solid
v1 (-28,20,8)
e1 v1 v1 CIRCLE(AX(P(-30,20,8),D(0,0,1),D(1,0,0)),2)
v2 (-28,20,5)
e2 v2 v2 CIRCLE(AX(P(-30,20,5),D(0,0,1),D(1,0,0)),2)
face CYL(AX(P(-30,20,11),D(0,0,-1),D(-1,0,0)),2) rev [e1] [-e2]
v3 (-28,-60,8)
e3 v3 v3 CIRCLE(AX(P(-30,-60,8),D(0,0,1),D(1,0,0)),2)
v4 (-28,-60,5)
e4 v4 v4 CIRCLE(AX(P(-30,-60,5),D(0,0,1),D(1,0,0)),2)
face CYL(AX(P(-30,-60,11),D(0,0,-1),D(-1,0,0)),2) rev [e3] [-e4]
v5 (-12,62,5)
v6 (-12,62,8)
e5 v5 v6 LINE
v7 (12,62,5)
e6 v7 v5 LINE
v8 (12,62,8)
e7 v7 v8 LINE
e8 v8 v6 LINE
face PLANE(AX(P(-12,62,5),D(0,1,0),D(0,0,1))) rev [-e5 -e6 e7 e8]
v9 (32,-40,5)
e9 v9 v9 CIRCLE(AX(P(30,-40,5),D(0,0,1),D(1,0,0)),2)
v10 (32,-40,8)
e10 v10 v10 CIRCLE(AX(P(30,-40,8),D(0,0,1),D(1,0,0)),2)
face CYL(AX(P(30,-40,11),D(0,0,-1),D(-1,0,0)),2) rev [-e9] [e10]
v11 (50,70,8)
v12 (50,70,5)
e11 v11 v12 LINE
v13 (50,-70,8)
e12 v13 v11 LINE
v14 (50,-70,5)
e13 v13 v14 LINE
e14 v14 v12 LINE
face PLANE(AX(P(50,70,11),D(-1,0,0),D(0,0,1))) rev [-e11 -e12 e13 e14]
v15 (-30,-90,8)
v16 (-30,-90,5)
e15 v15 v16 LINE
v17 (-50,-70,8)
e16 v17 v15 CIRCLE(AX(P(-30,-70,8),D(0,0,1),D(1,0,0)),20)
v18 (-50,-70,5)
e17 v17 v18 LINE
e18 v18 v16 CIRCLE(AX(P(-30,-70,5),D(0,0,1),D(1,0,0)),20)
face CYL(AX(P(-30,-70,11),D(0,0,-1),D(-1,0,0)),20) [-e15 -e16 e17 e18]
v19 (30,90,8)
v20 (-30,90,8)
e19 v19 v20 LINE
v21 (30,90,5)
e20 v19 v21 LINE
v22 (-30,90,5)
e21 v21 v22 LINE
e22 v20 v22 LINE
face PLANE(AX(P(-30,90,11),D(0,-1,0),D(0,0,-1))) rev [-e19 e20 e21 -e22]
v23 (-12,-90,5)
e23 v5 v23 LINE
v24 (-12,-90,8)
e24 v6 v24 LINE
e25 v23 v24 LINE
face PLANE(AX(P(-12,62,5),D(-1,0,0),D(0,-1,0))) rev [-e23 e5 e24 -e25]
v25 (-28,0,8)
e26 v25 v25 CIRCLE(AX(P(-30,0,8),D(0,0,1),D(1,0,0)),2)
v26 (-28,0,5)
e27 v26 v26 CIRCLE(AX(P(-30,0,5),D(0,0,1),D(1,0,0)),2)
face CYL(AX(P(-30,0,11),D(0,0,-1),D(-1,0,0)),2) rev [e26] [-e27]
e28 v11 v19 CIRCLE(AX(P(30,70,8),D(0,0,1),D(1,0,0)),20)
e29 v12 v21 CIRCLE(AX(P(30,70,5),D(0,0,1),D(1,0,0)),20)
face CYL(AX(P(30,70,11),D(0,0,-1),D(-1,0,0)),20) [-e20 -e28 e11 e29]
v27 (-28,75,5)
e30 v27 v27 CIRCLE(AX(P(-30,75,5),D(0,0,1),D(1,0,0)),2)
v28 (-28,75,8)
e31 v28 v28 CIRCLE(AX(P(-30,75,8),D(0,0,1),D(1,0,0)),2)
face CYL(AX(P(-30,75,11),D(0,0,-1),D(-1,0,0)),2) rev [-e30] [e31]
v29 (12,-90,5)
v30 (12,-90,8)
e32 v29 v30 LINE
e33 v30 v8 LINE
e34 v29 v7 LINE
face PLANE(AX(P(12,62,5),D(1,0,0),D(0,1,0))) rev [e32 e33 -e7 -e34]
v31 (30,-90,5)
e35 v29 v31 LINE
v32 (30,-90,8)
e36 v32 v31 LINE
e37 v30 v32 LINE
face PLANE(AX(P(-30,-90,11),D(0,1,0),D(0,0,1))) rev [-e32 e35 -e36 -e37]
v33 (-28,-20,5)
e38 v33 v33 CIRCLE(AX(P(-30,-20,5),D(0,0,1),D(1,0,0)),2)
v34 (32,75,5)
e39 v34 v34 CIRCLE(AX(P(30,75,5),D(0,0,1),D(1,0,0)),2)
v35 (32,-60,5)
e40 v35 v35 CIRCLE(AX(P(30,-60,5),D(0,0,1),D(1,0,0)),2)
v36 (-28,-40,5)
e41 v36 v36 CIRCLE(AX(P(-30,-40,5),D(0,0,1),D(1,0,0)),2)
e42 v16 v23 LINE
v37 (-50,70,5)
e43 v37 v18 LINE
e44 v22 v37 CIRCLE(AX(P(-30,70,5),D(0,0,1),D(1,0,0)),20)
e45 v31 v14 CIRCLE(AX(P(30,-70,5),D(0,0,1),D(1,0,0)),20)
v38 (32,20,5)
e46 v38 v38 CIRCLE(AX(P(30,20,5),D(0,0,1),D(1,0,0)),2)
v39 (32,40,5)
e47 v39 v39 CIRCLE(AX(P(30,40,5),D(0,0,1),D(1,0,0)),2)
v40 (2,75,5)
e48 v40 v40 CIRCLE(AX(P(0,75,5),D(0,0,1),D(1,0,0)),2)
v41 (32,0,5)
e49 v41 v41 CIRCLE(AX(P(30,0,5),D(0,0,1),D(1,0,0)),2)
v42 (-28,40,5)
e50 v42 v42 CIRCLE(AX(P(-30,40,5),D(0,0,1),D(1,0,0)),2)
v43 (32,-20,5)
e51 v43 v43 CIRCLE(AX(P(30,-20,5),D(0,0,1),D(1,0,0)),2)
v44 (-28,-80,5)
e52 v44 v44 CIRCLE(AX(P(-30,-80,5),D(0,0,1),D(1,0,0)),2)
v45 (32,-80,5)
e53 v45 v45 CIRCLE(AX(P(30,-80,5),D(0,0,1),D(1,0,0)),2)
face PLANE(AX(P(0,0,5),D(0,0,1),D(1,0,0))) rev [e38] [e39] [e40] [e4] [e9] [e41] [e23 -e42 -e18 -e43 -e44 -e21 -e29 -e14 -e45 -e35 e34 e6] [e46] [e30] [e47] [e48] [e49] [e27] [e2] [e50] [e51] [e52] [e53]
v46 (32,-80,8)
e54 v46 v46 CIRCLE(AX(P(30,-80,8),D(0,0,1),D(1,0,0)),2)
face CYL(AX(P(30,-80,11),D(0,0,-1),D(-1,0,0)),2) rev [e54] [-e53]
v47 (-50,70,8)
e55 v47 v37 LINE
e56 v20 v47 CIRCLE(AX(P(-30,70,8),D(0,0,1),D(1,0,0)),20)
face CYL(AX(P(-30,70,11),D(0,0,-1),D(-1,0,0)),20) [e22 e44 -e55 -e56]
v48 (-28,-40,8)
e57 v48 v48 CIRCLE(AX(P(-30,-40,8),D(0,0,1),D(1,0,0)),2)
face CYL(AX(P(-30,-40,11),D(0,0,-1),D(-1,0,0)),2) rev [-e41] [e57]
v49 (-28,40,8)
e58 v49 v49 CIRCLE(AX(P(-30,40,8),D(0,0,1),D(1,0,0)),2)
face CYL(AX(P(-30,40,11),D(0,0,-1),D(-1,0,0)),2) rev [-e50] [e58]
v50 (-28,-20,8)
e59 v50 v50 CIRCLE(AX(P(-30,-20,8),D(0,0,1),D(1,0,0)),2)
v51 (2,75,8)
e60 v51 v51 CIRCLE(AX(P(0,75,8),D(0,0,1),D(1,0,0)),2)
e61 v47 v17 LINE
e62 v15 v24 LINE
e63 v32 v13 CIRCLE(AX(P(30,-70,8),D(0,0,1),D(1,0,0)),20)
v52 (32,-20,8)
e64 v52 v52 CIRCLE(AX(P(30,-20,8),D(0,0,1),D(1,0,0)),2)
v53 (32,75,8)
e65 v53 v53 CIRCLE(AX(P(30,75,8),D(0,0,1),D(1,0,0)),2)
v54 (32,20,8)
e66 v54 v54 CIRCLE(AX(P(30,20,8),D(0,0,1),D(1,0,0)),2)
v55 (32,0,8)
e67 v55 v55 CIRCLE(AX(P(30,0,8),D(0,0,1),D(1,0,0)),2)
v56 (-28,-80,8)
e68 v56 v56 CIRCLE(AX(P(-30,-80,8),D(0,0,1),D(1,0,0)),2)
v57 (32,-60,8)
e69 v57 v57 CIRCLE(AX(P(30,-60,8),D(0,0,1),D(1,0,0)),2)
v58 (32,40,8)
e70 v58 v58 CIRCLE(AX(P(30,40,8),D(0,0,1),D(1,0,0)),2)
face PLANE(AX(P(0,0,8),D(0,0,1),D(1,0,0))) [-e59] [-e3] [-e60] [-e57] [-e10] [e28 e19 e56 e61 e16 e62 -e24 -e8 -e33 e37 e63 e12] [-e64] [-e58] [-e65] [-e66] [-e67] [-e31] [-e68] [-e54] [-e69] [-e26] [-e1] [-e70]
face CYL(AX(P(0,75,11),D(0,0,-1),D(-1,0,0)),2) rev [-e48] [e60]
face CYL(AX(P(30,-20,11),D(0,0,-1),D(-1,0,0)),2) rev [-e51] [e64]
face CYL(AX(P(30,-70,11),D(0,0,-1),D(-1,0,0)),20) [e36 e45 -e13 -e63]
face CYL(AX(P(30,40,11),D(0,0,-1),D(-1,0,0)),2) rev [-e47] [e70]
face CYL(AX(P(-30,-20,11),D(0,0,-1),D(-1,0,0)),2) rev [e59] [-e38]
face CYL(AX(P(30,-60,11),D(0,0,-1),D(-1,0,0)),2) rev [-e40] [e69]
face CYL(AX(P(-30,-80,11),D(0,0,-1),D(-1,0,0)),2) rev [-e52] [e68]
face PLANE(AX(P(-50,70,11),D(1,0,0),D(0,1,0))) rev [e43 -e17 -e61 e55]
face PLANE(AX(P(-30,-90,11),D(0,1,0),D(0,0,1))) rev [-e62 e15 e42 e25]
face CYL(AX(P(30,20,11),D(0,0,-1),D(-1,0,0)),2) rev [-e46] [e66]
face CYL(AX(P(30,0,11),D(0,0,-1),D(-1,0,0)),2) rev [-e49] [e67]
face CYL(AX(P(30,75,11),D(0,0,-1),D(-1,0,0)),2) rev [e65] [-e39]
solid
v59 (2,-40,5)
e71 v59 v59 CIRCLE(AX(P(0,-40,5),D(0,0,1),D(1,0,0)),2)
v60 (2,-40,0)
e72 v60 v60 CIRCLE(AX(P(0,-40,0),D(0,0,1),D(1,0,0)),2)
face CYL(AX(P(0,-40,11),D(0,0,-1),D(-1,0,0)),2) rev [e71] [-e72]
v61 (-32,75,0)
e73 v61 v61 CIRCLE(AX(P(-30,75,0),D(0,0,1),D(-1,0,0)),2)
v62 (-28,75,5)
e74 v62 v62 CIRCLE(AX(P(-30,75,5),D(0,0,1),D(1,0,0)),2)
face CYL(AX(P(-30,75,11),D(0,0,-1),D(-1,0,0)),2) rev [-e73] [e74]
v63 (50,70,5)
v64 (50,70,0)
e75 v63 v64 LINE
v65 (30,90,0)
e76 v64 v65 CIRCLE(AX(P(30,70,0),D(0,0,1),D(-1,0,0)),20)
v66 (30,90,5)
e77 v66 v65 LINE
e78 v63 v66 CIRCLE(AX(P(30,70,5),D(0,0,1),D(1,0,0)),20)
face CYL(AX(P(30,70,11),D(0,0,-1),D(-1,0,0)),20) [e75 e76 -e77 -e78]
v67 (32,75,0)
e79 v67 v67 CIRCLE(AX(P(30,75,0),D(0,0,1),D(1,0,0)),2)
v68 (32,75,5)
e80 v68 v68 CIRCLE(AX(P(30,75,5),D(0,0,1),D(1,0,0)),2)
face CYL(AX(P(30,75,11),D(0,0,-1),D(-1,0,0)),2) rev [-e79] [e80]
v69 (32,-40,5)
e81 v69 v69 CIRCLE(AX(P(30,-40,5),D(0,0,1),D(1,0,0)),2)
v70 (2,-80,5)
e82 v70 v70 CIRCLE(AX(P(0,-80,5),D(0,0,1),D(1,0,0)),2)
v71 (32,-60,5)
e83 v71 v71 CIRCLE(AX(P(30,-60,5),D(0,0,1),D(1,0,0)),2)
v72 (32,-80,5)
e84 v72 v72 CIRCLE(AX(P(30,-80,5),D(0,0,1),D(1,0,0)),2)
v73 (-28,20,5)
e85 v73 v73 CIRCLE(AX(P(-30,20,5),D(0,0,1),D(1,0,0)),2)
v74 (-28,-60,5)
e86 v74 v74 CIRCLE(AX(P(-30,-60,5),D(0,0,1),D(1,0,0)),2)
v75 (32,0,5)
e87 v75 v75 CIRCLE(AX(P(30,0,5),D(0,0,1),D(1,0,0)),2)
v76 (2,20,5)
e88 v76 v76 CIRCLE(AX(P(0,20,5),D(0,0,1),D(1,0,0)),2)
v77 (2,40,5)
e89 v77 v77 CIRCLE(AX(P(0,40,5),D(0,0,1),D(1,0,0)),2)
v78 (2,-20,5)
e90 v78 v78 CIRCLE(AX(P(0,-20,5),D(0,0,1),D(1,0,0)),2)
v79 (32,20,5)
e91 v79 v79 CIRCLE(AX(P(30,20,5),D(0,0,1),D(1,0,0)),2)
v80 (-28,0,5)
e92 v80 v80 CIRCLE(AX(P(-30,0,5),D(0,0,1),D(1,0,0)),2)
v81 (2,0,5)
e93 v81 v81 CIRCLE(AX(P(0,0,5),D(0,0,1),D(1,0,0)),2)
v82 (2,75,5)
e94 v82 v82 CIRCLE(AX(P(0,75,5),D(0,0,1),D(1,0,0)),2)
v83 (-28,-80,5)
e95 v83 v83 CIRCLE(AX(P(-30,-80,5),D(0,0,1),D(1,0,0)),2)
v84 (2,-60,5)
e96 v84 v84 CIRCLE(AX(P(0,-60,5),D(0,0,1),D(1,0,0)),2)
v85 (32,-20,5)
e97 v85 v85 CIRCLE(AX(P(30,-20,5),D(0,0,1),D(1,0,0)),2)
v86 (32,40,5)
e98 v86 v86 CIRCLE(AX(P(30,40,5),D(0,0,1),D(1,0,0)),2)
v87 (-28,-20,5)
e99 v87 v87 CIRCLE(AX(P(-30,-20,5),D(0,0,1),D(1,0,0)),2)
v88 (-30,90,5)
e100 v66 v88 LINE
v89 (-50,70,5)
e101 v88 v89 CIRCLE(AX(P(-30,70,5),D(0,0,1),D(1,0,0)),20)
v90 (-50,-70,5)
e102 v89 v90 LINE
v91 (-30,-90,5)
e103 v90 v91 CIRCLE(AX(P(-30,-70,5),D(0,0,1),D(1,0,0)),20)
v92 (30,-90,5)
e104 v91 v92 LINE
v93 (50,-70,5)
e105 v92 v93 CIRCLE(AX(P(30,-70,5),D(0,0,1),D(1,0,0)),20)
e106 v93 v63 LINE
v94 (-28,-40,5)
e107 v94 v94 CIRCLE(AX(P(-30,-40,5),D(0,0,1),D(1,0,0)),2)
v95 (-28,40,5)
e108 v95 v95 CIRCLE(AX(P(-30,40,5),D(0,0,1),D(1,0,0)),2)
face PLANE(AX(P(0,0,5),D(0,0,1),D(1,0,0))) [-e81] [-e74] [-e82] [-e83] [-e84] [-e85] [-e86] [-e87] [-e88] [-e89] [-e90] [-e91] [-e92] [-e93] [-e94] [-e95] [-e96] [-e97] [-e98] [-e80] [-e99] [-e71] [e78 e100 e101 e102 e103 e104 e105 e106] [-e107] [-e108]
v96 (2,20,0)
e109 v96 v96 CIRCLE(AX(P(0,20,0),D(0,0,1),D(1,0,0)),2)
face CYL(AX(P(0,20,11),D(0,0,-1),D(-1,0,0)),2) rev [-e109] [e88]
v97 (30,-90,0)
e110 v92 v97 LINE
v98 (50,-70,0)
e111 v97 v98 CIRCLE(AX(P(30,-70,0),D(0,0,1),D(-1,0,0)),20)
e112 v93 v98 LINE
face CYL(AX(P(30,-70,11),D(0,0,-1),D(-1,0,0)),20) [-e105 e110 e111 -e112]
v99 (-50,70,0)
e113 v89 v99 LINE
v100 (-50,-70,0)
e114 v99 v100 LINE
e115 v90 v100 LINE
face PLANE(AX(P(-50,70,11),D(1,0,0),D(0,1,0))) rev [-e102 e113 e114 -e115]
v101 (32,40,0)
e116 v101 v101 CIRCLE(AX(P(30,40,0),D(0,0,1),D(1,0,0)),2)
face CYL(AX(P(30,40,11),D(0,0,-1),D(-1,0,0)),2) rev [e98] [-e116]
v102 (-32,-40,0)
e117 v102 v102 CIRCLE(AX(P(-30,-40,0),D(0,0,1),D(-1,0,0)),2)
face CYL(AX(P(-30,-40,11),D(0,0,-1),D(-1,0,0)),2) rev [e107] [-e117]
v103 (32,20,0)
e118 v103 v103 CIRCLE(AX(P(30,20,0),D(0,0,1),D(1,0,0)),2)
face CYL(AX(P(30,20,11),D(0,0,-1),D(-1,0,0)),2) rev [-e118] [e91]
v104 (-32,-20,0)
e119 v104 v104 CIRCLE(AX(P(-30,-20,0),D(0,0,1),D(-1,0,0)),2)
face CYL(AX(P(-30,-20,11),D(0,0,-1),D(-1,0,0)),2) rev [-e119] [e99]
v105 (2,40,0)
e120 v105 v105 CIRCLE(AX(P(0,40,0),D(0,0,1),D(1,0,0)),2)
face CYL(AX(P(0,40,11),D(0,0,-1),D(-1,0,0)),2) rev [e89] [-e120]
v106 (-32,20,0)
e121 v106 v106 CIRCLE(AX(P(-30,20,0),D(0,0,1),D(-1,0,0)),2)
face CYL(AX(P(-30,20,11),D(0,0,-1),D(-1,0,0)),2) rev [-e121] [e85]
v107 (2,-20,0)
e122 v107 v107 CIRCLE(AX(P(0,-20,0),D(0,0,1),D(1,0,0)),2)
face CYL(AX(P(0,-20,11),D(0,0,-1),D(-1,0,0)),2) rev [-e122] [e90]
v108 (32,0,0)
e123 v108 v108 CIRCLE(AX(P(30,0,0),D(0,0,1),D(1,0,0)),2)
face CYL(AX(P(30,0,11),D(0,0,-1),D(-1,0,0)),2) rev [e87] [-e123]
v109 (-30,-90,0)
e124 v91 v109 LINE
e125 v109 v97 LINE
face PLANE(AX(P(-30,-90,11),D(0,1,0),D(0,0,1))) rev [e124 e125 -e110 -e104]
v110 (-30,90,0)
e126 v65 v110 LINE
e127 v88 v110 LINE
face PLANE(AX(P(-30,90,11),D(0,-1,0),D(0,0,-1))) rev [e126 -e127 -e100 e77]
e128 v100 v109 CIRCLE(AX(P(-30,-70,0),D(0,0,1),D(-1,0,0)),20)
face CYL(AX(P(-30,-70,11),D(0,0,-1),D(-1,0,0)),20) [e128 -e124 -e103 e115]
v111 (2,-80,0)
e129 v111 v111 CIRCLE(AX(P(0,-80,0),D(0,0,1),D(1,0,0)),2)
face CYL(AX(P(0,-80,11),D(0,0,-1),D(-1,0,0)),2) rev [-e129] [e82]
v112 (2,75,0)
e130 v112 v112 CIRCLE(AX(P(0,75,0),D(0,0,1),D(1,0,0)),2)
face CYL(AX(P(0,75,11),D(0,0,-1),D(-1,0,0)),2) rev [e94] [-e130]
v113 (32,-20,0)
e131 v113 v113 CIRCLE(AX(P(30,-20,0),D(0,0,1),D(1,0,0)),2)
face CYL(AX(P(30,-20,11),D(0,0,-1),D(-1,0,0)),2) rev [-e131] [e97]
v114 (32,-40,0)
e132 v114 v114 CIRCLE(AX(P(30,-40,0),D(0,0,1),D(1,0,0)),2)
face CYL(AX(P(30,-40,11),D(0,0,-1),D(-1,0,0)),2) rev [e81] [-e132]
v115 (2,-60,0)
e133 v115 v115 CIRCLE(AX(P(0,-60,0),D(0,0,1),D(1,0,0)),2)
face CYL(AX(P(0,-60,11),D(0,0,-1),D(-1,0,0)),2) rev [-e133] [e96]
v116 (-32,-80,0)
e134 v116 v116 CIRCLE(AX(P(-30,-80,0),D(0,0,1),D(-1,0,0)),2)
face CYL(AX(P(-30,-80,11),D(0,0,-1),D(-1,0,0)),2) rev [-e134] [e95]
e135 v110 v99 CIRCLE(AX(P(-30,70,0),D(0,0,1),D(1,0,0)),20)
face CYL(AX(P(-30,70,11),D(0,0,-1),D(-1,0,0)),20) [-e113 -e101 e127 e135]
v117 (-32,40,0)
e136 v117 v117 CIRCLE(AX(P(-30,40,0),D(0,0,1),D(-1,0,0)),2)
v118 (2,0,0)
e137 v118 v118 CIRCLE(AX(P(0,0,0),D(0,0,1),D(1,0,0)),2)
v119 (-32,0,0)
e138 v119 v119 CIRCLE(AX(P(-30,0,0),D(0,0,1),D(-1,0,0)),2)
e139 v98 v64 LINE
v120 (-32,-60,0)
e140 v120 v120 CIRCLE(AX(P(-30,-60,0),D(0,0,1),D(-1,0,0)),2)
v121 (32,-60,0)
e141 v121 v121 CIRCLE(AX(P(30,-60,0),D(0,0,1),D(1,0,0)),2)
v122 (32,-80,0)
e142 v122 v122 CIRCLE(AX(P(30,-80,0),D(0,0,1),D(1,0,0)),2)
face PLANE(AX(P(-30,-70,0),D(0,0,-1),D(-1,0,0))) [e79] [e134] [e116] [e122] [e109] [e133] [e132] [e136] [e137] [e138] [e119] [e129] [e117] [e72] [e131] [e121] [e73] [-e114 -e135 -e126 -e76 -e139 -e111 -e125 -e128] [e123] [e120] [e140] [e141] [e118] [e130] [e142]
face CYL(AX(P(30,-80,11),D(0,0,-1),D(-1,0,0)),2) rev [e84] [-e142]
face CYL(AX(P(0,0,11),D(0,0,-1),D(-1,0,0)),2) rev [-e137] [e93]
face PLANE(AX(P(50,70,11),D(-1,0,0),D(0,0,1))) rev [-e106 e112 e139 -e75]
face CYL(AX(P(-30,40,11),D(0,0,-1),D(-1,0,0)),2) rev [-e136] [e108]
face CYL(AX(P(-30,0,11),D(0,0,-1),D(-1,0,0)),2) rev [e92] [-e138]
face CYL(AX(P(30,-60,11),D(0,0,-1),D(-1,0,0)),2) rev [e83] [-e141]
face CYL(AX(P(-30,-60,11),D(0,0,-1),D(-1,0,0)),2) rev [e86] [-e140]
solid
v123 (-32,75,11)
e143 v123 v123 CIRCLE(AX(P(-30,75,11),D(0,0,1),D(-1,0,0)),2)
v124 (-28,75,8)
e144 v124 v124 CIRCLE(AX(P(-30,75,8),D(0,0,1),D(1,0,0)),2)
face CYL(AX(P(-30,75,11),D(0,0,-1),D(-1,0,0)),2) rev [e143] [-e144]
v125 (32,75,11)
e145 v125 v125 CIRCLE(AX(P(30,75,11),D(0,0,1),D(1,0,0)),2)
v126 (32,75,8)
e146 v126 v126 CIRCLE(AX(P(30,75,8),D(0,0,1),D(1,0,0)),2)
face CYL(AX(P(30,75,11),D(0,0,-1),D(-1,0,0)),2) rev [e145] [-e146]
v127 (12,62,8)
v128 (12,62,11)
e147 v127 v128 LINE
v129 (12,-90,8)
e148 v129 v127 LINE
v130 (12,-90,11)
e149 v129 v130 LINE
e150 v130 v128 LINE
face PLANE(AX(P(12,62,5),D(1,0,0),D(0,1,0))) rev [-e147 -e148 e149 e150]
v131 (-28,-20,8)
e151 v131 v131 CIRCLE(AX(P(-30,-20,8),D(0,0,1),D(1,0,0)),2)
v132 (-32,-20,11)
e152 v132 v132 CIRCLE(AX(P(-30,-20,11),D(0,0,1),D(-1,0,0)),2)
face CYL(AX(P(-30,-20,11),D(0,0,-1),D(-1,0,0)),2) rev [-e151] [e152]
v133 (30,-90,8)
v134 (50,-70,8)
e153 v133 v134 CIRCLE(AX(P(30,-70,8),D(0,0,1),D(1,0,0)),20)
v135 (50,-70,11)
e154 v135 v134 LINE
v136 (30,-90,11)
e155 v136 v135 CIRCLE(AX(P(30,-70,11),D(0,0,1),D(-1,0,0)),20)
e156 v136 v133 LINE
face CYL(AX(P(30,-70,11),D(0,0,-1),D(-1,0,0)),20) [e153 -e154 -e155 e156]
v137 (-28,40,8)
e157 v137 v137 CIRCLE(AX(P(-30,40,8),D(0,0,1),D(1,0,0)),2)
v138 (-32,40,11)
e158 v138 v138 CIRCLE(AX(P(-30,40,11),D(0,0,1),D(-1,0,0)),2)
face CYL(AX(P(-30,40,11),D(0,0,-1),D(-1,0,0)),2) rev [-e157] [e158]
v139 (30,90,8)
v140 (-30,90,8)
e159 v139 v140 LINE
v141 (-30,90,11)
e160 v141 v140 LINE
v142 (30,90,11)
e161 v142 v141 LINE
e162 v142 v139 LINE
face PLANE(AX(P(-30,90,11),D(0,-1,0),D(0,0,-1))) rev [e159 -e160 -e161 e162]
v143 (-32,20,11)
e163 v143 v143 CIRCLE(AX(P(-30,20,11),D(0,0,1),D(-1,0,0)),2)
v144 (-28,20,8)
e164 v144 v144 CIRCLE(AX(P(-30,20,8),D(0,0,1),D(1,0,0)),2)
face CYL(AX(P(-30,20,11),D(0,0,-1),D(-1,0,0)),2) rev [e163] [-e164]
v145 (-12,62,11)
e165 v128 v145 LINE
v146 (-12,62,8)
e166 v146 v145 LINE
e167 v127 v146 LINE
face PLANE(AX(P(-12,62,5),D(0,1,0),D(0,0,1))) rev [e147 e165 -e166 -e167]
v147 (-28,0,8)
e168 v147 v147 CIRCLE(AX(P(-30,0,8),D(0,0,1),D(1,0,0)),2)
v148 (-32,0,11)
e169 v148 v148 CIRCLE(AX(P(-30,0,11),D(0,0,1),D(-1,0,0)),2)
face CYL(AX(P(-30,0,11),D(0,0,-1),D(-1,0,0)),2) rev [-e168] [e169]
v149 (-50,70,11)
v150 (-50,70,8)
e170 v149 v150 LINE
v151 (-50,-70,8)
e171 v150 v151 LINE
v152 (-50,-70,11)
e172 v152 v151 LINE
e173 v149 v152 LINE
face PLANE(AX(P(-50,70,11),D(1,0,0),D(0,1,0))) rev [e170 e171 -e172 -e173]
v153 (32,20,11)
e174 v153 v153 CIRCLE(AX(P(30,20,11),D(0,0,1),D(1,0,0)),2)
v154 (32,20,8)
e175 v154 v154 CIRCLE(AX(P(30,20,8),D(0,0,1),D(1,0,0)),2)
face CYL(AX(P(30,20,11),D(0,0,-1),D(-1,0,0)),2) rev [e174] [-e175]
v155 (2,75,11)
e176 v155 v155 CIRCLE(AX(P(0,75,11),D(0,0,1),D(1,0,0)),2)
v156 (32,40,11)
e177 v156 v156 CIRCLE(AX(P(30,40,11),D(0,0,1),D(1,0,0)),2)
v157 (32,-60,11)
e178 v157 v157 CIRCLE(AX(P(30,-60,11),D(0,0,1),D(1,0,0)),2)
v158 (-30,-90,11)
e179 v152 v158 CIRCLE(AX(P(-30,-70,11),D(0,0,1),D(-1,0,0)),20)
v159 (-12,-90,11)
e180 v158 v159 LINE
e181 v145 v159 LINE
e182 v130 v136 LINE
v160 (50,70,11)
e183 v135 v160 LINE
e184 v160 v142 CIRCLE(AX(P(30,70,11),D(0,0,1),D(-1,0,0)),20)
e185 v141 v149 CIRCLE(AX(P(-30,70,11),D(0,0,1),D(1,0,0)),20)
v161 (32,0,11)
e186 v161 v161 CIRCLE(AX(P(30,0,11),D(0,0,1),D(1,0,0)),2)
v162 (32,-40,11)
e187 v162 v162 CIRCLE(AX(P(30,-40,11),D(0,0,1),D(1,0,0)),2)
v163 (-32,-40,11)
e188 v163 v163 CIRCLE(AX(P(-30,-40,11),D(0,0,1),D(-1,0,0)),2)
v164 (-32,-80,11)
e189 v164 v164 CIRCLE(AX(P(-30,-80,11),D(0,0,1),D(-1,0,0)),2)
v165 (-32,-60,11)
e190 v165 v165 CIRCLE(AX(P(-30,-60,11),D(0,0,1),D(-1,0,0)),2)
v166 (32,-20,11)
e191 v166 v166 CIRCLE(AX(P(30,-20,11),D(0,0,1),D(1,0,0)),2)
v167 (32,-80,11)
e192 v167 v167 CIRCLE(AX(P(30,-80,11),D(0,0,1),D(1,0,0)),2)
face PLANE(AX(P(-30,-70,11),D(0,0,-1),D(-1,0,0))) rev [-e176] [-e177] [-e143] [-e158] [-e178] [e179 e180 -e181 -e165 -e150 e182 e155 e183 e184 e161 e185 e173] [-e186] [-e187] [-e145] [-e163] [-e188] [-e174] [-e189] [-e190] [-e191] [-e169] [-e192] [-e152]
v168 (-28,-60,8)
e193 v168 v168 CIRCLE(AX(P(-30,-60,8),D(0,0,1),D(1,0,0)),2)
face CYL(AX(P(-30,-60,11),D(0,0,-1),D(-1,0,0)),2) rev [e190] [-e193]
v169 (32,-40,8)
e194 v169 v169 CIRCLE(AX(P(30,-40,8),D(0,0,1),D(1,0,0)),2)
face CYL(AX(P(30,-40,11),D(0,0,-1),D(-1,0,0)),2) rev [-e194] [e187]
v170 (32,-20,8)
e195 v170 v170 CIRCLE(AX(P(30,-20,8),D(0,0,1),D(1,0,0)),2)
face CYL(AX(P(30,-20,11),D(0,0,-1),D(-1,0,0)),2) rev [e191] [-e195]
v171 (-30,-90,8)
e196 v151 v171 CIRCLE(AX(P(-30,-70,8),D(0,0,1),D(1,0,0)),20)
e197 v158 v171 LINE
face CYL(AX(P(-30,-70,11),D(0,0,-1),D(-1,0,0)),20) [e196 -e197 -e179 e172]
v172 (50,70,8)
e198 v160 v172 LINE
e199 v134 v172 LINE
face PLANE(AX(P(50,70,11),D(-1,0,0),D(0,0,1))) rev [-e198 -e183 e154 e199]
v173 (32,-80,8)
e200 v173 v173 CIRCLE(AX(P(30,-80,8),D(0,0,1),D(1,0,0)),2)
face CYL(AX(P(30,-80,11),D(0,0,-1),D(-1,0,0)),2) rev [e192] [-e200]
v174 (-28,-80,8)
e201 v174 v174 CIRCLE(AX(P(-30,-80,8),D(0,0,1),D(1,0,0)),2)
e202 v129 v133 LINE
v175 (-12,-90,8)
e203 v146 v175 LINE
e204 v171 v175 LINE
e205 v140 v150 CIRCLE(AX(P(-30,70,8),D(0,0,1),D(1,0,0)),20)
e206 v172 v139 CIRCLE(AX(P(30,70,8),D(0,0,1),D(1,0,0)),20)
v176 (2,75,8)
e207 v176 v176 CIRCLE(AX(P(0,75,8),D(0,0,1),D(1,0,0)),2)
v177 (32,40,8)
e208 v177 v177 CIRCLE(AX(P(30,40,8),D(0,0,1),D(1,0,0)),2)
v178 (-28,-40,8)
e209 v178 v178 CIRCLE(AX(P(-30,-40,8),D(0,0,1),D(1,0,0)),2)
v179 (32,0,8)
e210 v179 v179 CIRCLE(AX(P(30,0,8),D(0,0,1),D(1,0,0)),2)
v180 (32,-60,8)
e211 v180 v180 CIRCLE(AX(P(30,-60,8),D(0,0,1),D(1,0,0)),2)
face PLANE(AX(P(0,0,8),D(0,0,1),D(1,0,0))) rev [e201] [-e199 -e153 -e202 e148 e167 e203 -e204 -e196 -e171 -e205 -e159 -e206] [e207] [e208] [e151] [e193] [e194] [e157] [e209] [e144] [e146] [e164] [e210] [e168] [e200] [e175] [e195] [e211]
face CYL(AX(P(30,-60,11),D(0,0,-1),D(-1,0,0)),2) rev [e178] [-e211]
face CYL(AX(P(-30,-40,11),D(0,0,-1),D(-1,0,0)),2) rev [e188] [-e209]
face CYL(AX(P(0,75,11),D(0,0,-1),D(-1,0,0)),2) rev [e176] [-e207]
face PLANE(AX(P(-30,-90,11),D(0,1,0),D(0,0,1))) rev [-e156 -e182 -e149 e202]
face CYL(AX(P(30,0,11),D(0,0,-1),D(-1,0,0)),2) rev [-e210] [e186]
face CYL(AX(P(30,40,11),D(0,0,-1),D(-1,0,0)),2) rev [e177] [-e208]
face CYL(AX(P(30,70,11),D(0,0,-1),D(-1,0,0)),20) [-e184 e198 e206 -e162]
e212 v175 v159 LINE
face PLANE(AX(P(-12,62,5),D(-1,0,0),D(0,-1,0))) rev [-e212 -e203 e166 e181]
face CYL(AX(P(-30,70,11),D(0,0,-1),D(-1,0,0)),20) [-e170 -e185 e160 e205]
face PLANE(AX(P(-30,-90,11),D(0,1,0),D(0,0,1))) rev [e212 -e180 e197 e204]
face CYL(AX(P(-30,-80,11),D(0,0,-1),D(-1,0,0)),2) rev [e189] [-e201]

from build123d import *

# Parameters (mm, degrees)
SKETCH_1_R                 = 2
EXTRUDE_1_DEPTH            = 11
SPLIT_BODIES_1_OUTLINE_R   = 2
SPLIT_BODIES_1_DEPTH       = 5
SPLIT_BODIES_1_2_OUTLINE_R = 2
SPLIT_BODIES_1_2_DEPTH     = 5
SPLIT_START                = 8
SPLIT_BODIES_1_3_OUTLINE_R = 2
SPLIT_BODIES_1_3_DEPTH     = 3
SPLIT_BODIES_1_4_OUTLINE_R = 2
SPLIT_BODIES_1_4_DEPTH     = 3
SKETCH_2_W                 = 24
SKETCH_2_H                 = 152
CUT_EXTRUDE_1_DEPTH        = 6


# Read off the part's stored shape, not the designer's step: 分割1
with BuildPart() as part:
    # 草图1 → 凸台-拉伸1 (new body)
    with BuildSketch(Plane.XY):
        with BuildLine():
            Line((-30, 90), (30, 90))
            ThreePointArc((30, 90), (44.142135624, 84.142135624), (50, 70))
            Line((50, 70), (50, -70))
            ThreePointArc((50, -70), (44.142135624, -84.142135624), (30, -90))
            Line((30, -90), (-30, -90))
            ThreePointArc((-30, -90), (-44.142135624, -84.142135624), (-50, -70))
            Line((-50, -70), (-50, 70))
            ThreePointArc((-50, 70), (-44.142135624, 84.142135624), (-30, 90))
        make_face()
        with Locations((0, 40)):
            Circle(SKETCH_1_R, mode=Mode.SUBTRACT)
        with Locations((0, 75)):
            Circle(SKETCH_1_R, mode=Mode.SUBTRACT)
        with Locations((0, 20)):
            Circle(SKETCH_1_R, mode=Mode.SUBTRACT)
        Circle(SKETCH_1_R, mode=Mode.SUBTRACT)
        with Locations((0, -20)):
            Circle(SKETCH_1_R, mode=Mode.SUBTRACT)
        with Locations((0, -40)):
            Circle(SKETCH_1_R, mode=Mode.SUBTRACT)
        with Locations((0, -60)):
            Circle(SKETCH_1_R, mode=Mode.SUBTRACT)
        with Locations((0, -80)):
            Circle(SKETCH_1_R, mode=Mode.SUBTRACT)
        with Locations((30, 40)):
            Circle(SKETCH_1_R, mode=Mode.SUBTRACT)
        with Locations((30, 20)):
            Circle(SKETCH_1_R, mode=Mode.SUBTRACT)
        with Locations((30, 0)):
            Circle(SKETCH_1_R, mode=Mode.SUBTRACT)
        with Locations((30, -20)):
            Circle(SKETCH_1_R, mode=Mode.SUBTRACT)
        with Locations((30, -40)):
            Circle(SKETCH_1_R, mode=Mode.SUBTRACT)
        with Locations((30, -60)):
            Circle(SKETCH_1_R, mode=Mode.SUBTRACT)
        with Locations((30, -80)):
            Circle(SKETCH_1_R, mode=Mode.SUBTRACT)
        with Locations(Location((-30, 40, 0), (0, 0, 180))):
            Circle(SKETCH_1_R, mode=Mode.SUBTRACT)
        with Locations(Location((-30, 20, 0), (0, 0, 180))):
            Circle(SKETCH_1_R, mode=Mode.SUBTRACT)
        with Locations(Location((-30, 0, 0), (0, 0, 180))):
            Circle(SKETCH_1_R, mode=Mode.SUBTRACT)
        with Locations(Location((-30, -20, 0), (0, 0, 180))):
            Circle(SKETCH_1_R, mode=Mode.SUBTRACT)
        with Locations(Location((-30, -40, 0), (0, 0, 180))):
            Circle(SKETCH_1_R, mode=Mode.SUBTRACT)
        with Locations(Location((-30, -60, 0), (0, 0, 180))):
            Circle(SKETCH_1_R, mode=Mode.SUBTRACT)
        with Locations(Location((-30, -80, 0), (0, 0, 180))):
            Circle(SKETCH_1_R, mode=Mode.SUBTRACT)
        with Locations((30, 75)):
            Circle(SKETCH_1_R, mode=Mode.SUBTRACT)
        with Locations(Location((-30, 75, 0), (0, 0, 180))):
            Circle(SKETCH_1_R, mode=Mode.SUBTRACT)
    extrude(amount=EXTRUDE_1_DEPTH)

    # Split Bodies 1 2 outline → Split Bodies 1 2 (cut)
    with BuildSketch(Plane.XY):
        with BuildLine():
            ThreePointArc((-50, -70), (-44.142135624, -84.142135624), (-30, -90))
            Line((-30, -90), (30, -90))
            ThreePointArc((30, -90), (44.142135624, -84.142135624), (50, -70))
            Line((50, -70), (50, 70))
            ThreePointArc((50, 70), (44.142135624, 84.142135624), (30, 90))
            Line((30, 90), (-30, 90))
            ThreePointArc((-30, 90), (-44.142135624, 84.142135624), (-50, 70))
            Line((-50, 70), (-50, -70))
        make_face()
        with Locations((-30, -80)):
            Circle(SPLIT_BODIES_1_2_OUTLINE_R, mode=Mode.SUBTRACT)
        with Locations((-30, -60)):
            Circle(SPLIT_BODIES_1_2_OUTLINE_R, mode=Mode.SUBTRACT)
        with Locations((-30, -40)):
            Circle(SPLIT_BODIES_1_2_OUTLINE_R, mode=Mode.SUBTRACT)
        with Locations((-30, -20)):
            Circle(SPLIT_BODIES_1_2_OUTLINE_R, mode=Mode.SUBTRACT)
        with Locations((0, -80)):
            Circle(SPLIT_BODIES_1_2_OUTLINE_R, mode=Mode.SUBTRACT)
        with Locations((0, -60)):
            Circle(SPLIT_BODIES_1_2_OUTLINE_R, mode=Mode.SUBTRACT)
        with Locations((30, -80)):
            Circle(SPLIT_BODIES_1_2_OUTLINE_R, mode=Mode.SUBTRACT)
        with Locations((30, -60)):
            Circle(SPLIT_BODIES_1_2_OUTLINE_R, mode=Mode.SUBTRACT)
        with Locations((0, -40)):
            Circle(SPLIT_BODIES_1_2_OUTLINE_R, mode=Mode.SUBTRACT)
        with Locations((0, -20)):
            Circle(SPLIT_BODIES_1_2_OUTLINE_R, mode=Mode.SUBTRACT)
        with Locations((30, -40)):
            Circle(SPLIT_BODIES_1_2_OUTLINE_R, mode=Mode.SUBTRACT)
        with Locations((30, -20)):
            Circle(SPLIT_BODIES_1_2_OUTLINE_R, mode=Mode.SUBTRACT)
        with Locations((-30, 0)):
            Circle(SPLIT_BODIES_1_2_OUTLINE_R, mode=Mode.SUBTRACT)
        with Locations((-30, 20)):
            Circle(SPLIT_BODIES_1_2_OUTLINE_R, mode=Mode.SUBTRACT)
        with Locations((-30, 40)):
            Circle(SPLIT_BODIES_1_2_OUTLINE_R, mode=Mode.SUBTRACT)
        with Locations((-30, 75)):
            Circle(SPLIT_BODIES_1_2_OUTLINE_R, mode=Mode.SUBTRACT)
        Circle(SPLIT_BODIES_1_2_OUTLINE_R, mode=Mode.SUBTRACT)
        with Locations((0, 20)):
            Circle(SPLIT_BODIES_1_2_OUTLINE_R, mode=Mode.SUBTRACT)
        with Locations((0, 40)):
            Circle(SPLIT_BODIES_1_2_OUTLINE_R, mode=Mode.SUBTRACT)
        with Locations((30, 0)):
            Circle(SPLIT_BODIES_1_2_OUTLINE_R, mode=Mode.SUBTRACT)
        with Locations((30, 20)):
            Circle(SPLIT_BODIES_1_2_OUTLINE_R, mode=Mode.SUBTRACT)
        with Locations((30, 40)):
            Circle(SPLIT_BODIES_1_2_OUTLINE_R, mode=Mode.SUBTRACT)
        with Locations((0, 75)):
            Circle(SPLIT_BODIES_1_2_OUTLINE_R, mode=Mode.SUBTRACT)
        with Locations((30, 75)):
            Circle(SPLIT_BODIES_1_2_OUTLINE_R, mode=Mode.SUBTRACT)
    extrude(amount=SPLIT_BODIES_1_2_DEPTH, mode=Mode.SUBTRACT)

    # Split Bodies 1 3 outline → Split Bodies 1 3 (cut)
    with BuildSketch(Plane.XY.offset(SPLIT_START)):
        with BuildLine():
            ThreePointArc((-50, -70), (-44.142135624, -84.142135624), (-30, -90))
            Line((-30, -90), (30, -90))
            ThreePointArc((30, -90), (44.142135624, -84.142135624), (50, -70))
            Line((50, -70), (50, 70))
            ThreePointArc((50, 70), (44.142135624, 84.142135624), (30, 90))
            Line((30, 90), (-30, 90))
            ThreePointArc((-30, 90), (-44.142135624, 84.142135624), (-50, 70))
            Line((-50, 70), (-50, -70))
        make_face()
        with Locations((-30, -80)):
            Circle(SPLIT_BODIES_1_3_OUTLINE_R, mode=Mode.SUBTRACT)
        with Locations((-30, -60)):
            Circle(SPLIT_BODIES_1_3_OUTLINE_R, mode=Mode.SUBTRACT)
        with Locations((-30, -40)):
            Circle(SPLIT_BODIES_1_3_OUTLINE_R, mode=Mode.SUBTRACT)
        with Locations((-30, -20)):
            Circle(SPLIT_BODIES_1_3_OUTLINE_R, mode=Mode.SUBTRACT)
        with Locations((0, -80)):
            Circle(SPLIT_BODIES_1_3_OUTLINE_R, mode=Mode.SUBTRACT)
        with Locations((0, -60)):
            Circle(SPLIT_BODIES_1_3_OUTLINE_R, mode=Mode.SUBTRACT)
        with Locations((30, -80)):
            Circle(SPLIT_BODIES_1_3_OUTLINE_R, mode=Mode.SUBTRACT)
        with Locations((30, -60)):
            Circle(SPLIT_BODIES_1_3_OUTLINE_R, mode=Mode.SUBTRACT)
        with Locations((0, -40)):
            Circle(SPLIT_BODIES_1_3_OUTLINE_R, mode=Mode.SUBTRACT)
        with Locations((0, -20)):
            Circle(SPLIT_BODIES_1_3_OUTLINE_R, mode=Mode.SUBTRACT)
        with Locations((30, -40)):
            Circle(SPLIT_BODIES_1_3_OUTLINE_R, mode=Mode.SUBTRACT)
        with Locations((30, -20)):
            Circle(SPLIT_BODIES_1_3_OUTLINE_R, mode=Mode.SUBTRACT)
        with Locations((-30, 0)):
            Circle(SPLIT_BODIES_1_3_OUTLINE_R, mode=Mode.SUBTRACT)
        with Locations((-30, 20)):
            Circle(SPLIT_BODIES_1_3_OUTLINE_R, mode=Mode.SUBTRACT)
        with Locations((-30, 40)):
            Circle(SPLIT_BODIES_1_3_OUTLINE_R, mode=Mode.SUBTRACT)
        with Locations((-30, 75)):
            Circle(SPLIT_BODIES_1_3_OUTLINE_R, mode=Mode.SUBTRACT)
        Circle(SPLIT_BODIES_1_3_OUTLINE_R, mode=Mode.SUBTRACT)
        with Locations((0, 20)):
            Circle(SPLIT_BODIES_1_3_OUTLINE_R, mode=Mode.SUBTRACT)
        with Locations((0, 40)):
            Circle(SPLIT_BODIES_1_3_OUTLINE_R, mode=Mode.SUBTRACT)
        with Locations((30, 0)):
            Circle(SPLIT_BODIES_1_3_OUTLINE_R, mode=Mode.SUBTRACT)
        with Locations((30, 20)):
            Circle(SPLIT_BODIES_1_3_OUTLINE_R, mode=Mode.SUBTRACT)
        with Locations((30, 40)):
            Circle(SPLIT_BODIES_1_3_OUTLINE_R, mode=Mode.SUBTRACT)
        with Locations((0, 75)):
            Circle(SPLIT_BODIES_1_3_OUTLINE_R, mode=Mode.SUBTRACT)
        with Locations((30, 75)):
            Circle(SPLIT_BODIES_1_3_OUTLINE_R, mode=Mode.SUBTRACT)
    extrude(amount=SPLIT_BODIES_1_3_DEPTH, mode=Mode.SUBTRACT)


with BuildPart() as body_2:
    # Split Bodies 1 outline → Split Bodies 1 (new body)
    with BuildSketch(Plane.XY):
        with BuildLine():
            Line((-30, -90), (30, -90))
            ThreePointArc((30, -90), (44.142135624, -84.142135624), (50, -70))
            Line((50, -70), (50, 70))
            ThreePointArc((50, 70), (44.142135624, 84.142135624), (30, 90))
            Line((30, 90), (-30, 90))
            ThreePointArc((-30, 90), (-44.142135624, 84.142135624), (-50, 70))
            Line((-50, 70), (-50, -70))
            ThreePointArc((-50, -70), (-44.142135624, -84.142135624), (-30, -90))
        make_face()
        with Locations((-30, -80)):
            Circle(SPLIT_BODIES_1_OUTLINE_R, mode=Mode.SUBTRACT)
        with Locations((-30, -60)):
            Circle(SPLIT_BODIES_1_OUTLINE_R, mode=Mode.SUBTRACT)
        with Locations((-30, -40)):
            Circle(SPLIT_BODIES_1_OUTLINE_R, mode=Mode.SUBTRACT)
        with Locations((-30, -20)):
            Circle(SPLIT_BODIES_1_OUTLINE_R, mode=Mode.SUBTRACT)
        with Locations((0, -80)):
            Circle(SPLIT_BODIES_1_OUTLINE_R, mode=Mode.SUBTRACT)
        with Locations((0, -60)):
            Circle(SPLIT_BODIES_1_OUTLINE_R, mode=Mode.SUBTRACT)
        with Locations((30, -80)):
            Circle(SPLIT_BODIES_1_OUTLINE_R, mode=Mode.SUBTRACT)
        with Locations((30, -60)):
            Circle(SPLIT_BODIES_1_OUTLINE_R, mode=Mode.SUBTRACT)
        with Locations((0, -40)):
            Circle(SPLIT_BODIES_1_OUTLINE_R, mode=Mode.SUBTRACT)
        with Locations((0, -20)):
            Circle(SPLIT_BODIES_1_OUTLINE_R, mode=Mode.SUBTRACT)
        with Locations((30, -40)):
            Circle(SPLIT_BODIES_1_OUTLINE_R, mode=Mode.SUBTRACT)
        with Locations((30, -20)):
            Circle(SPLIT_BODIES_1_OUTLINE_R, mode=Mode.SUBTRACT)
        with Locations((-30, 0)):
            Circle(SPLIT_BODIES_1_OUTLINE_R, mode=Mode.SUBTRACT)
        with Locations((-30, 20)):
            Circle(SPLIT_BODIES_1_OUTLINE_R, mode=Mode.SUBTRACT)
        with Locations((-30, 40)):
            Circle(SPLIT_BODIES_1_OUTLINE_R, mode=Mode.SUBTRACT)
        with Locations((-30, 75)):
            Circle(SPLIT_BODIES_1_OUTLINE_R, mode=Mode.SUBTRACT)
        Circle(SPLIT_BODIES_1_OUTLINE_R, mode=Mode.SUBTRACT)
        with Locations((0, 20)):
            Circle(SPLIT_BODIES_1_OUTLINE_R, mode=Mode.SUBTRACT)
        with Locations((0, 40)):
            Circle(SPLIT_BODIES_1_OUTLINE_R, mode=Mode.SUBTRACT)
        with Locations((30, 0)):
            Circle(SPLIT_BODIES_1_OUTLINE_R, mode=Mode.SUBTRACT)
        with Locations((30, 20)):
            Circle(SPLIT_BODIES_1_OUTLINE_R, mode=Mode.SUBTRACT)
        with Locations((30, 40)):
            Circle(SPLIT_BODIES_1_OUTLINE_R, mode=Mode.SUBTRACT)
        with Locations((0, 75)):
            Circle(SPLIT_BODIES_1_OUTLINE_R, mode=Mode.SUBTRACT)
        with Locations((30, 75)):
            Circle(SPLIT_BODIES_1_OUTLINE_R, mode=Mode.SUBTRACT)
    extrude(amount=SPLIT_BODIES_1_DEPTH)


with BuildPart() as body_3:
    # Split Bodies 1 4 outline → Split Bodies 1 4 (new body)
    with BuildSketch(Plane.XY.offset(SPLIT_START)):
        with BuildLine():
            Line((-30, -90), (30, -90))
            ThreePointArc((30, -90), (44.142135624, -84.142135624), (50, -70))
            Line((50, -70), (50, 70))
            ThreePointArc((50, 70), (44.142135624, 84.142135624), (30, 90))
            Line((30, 90), (-30, 90))
            ThreePointArc((-30, 90), (-44.142135624, 84.142135624), (-50, 70))
            Line((-50, 70), (-50, -70))
            ThreePointArc((-50, -70), (-44.142135624, -84.142135624), (-30, -90))
        make_face()
        with Locations((-30, -80)):
            Circle(SPLIT_BODIES_1_4_OUTLINE_R, mode=Mode.SUBTRACT)
        with Locations((-30, -60)):
            Circle(SPLIT_BODIES_1_4_OUTLINE_R, mode=Mode.SUBTRACT)
        with Locations((-30, -40)):
            Circle(SPLIT_BODIES_1_4_OUTLINE_R, mode=Mode.SUBTRACT)
        with Locations((-30, -20)):
            Circle(SPLIT_BODIES_1_4_OUTLINE_R, mode=Mode.SUBTRACT)
        with Locations((0, -80)):
            Circle(SPLIT_BODIES_1_4_OUTLINE_R, mode=Mode.SUBTRACT)
        with Locations((0, -60)):
            Circle(SPLIT_BODIES_1_4_OUTLINE_R, mode=Mode.SUBTRACT)
        with Locations((30, -80)):
            Circle(SPLIT_BODIES_1_4_OUTLINE_R, mode=Mode.SUBTRACT)
        with Locations((30, -60)):
            Circle(SPLIT_BODIES_1_4_OUTLINE_R, mode=Mode.SUBTRACT)
        with Locations((0, -40)):
            Circle(SPLIT_BODIES_1_4_OUTLINE_R, mode=Mode.SUBTRACT)
        with Locations((0, -20)):
            Circle(SPLIT_BODIES_1_4_OUTLINE_R, mode=Mode.SUBTRACT)
        with Locations((30, -40)):
            Circle(SPLIT_BODIES_1_4_OUTLINE_R, mode=Mode.SUBTRACT)
        with Locations((30, -20)):
            Circle(SPLIT_BODIES_1_4_OUTLINE_R, mode=Mode.SUBTRACT)
        with Locations((-30, 0)):
            Circle(SPLIT_BODIES_1_4_OUTLINE_R, mode=Mode.SUBTRACT)
        with Locations((-30, 20)):
            Circle(SPLIT_BODIES_1_4_OUTLINE_R, mode=Mode.SUBTRACT)
        with Locations((-30, 40)):
            Circle(SPLIT_BODIES_1_4_OUTLINE_R, mode=Mode.SUBTRACT)
        with Locations((-30, 75)):
            Circle(SPLIT_BODIES_1_4_OUTLINE_R, mode=Mode.SUBTRACT)
        Circle(SPLIT_BODIES_1_4_OUTLINE_R, mode=Mode.SUBTRACT)
        with Locations((0, 20)):
            Circle(SPLIT_BODIES_1_4_OUTLINE_R, mode=Mode.SUBTRACT)
        with Locations((0, 40)):
            Circle(SPLIT_BODIES_1_4_OUTLINE_R, mode=Mode.SUBTRACT)
        with Locations((30, 0)):
            Circle(SPLIT_BODIES_1_4_OUTLINE_R, mode=Mode.SUBTRACT)
        with Locations((30, 20)):
            Circle(SPLIT_BODIES_1_4_OUTLINE_R, mode=Mode.SUBTRACT)
        with Locations((30, 40)):
            Circle(SPLIT_BODIES_1_4_OUTLINE_R, mode=Mode.SUBTRACT)
        with Locations((0, 75)):
            Circle(SPLIT_BODIES_1_4_OUTLINE_R, mode=Mode.SUBTRACT)
        with Locations((30, 75)):
            Circle(SPLIT_BODIES_1_4_OUTLINE_R, mode=Mode.SUBTRACT)
    extrude(amount=SPLIT_BODIES_1_4_DEPTH)


with BuildPart() as cut_extrude_1_tool:
    # 草图2 → 切除-拉伸1 (new body)
    with BuildSketch(Plane.XY.offset(11)):
        with Locations((0, -14)):
            Rectangle(SKETCH_2_W, SKETCH_2_H)
    extrude(amount=-CUT_EXTRUDE_1_DEPTH)


with BuildPart() as part_1:
    add(part.part)

    # 切除-拉伸1: cut by cut_extrude_1_tool
    add(cut_extrude_1_tool.part, mode=Mode.SUBTRACT)


with BuildPart() as body_3_1:
    add(body_3.part)

    # 切除-拉伸1: cut by cut_extrude_1_tool
    add(cut_extrude_1_tool.part, mode=Mode.SUBTRACT)


solid = Compound([body_2.part, part_1.part, body_3_1.part])
